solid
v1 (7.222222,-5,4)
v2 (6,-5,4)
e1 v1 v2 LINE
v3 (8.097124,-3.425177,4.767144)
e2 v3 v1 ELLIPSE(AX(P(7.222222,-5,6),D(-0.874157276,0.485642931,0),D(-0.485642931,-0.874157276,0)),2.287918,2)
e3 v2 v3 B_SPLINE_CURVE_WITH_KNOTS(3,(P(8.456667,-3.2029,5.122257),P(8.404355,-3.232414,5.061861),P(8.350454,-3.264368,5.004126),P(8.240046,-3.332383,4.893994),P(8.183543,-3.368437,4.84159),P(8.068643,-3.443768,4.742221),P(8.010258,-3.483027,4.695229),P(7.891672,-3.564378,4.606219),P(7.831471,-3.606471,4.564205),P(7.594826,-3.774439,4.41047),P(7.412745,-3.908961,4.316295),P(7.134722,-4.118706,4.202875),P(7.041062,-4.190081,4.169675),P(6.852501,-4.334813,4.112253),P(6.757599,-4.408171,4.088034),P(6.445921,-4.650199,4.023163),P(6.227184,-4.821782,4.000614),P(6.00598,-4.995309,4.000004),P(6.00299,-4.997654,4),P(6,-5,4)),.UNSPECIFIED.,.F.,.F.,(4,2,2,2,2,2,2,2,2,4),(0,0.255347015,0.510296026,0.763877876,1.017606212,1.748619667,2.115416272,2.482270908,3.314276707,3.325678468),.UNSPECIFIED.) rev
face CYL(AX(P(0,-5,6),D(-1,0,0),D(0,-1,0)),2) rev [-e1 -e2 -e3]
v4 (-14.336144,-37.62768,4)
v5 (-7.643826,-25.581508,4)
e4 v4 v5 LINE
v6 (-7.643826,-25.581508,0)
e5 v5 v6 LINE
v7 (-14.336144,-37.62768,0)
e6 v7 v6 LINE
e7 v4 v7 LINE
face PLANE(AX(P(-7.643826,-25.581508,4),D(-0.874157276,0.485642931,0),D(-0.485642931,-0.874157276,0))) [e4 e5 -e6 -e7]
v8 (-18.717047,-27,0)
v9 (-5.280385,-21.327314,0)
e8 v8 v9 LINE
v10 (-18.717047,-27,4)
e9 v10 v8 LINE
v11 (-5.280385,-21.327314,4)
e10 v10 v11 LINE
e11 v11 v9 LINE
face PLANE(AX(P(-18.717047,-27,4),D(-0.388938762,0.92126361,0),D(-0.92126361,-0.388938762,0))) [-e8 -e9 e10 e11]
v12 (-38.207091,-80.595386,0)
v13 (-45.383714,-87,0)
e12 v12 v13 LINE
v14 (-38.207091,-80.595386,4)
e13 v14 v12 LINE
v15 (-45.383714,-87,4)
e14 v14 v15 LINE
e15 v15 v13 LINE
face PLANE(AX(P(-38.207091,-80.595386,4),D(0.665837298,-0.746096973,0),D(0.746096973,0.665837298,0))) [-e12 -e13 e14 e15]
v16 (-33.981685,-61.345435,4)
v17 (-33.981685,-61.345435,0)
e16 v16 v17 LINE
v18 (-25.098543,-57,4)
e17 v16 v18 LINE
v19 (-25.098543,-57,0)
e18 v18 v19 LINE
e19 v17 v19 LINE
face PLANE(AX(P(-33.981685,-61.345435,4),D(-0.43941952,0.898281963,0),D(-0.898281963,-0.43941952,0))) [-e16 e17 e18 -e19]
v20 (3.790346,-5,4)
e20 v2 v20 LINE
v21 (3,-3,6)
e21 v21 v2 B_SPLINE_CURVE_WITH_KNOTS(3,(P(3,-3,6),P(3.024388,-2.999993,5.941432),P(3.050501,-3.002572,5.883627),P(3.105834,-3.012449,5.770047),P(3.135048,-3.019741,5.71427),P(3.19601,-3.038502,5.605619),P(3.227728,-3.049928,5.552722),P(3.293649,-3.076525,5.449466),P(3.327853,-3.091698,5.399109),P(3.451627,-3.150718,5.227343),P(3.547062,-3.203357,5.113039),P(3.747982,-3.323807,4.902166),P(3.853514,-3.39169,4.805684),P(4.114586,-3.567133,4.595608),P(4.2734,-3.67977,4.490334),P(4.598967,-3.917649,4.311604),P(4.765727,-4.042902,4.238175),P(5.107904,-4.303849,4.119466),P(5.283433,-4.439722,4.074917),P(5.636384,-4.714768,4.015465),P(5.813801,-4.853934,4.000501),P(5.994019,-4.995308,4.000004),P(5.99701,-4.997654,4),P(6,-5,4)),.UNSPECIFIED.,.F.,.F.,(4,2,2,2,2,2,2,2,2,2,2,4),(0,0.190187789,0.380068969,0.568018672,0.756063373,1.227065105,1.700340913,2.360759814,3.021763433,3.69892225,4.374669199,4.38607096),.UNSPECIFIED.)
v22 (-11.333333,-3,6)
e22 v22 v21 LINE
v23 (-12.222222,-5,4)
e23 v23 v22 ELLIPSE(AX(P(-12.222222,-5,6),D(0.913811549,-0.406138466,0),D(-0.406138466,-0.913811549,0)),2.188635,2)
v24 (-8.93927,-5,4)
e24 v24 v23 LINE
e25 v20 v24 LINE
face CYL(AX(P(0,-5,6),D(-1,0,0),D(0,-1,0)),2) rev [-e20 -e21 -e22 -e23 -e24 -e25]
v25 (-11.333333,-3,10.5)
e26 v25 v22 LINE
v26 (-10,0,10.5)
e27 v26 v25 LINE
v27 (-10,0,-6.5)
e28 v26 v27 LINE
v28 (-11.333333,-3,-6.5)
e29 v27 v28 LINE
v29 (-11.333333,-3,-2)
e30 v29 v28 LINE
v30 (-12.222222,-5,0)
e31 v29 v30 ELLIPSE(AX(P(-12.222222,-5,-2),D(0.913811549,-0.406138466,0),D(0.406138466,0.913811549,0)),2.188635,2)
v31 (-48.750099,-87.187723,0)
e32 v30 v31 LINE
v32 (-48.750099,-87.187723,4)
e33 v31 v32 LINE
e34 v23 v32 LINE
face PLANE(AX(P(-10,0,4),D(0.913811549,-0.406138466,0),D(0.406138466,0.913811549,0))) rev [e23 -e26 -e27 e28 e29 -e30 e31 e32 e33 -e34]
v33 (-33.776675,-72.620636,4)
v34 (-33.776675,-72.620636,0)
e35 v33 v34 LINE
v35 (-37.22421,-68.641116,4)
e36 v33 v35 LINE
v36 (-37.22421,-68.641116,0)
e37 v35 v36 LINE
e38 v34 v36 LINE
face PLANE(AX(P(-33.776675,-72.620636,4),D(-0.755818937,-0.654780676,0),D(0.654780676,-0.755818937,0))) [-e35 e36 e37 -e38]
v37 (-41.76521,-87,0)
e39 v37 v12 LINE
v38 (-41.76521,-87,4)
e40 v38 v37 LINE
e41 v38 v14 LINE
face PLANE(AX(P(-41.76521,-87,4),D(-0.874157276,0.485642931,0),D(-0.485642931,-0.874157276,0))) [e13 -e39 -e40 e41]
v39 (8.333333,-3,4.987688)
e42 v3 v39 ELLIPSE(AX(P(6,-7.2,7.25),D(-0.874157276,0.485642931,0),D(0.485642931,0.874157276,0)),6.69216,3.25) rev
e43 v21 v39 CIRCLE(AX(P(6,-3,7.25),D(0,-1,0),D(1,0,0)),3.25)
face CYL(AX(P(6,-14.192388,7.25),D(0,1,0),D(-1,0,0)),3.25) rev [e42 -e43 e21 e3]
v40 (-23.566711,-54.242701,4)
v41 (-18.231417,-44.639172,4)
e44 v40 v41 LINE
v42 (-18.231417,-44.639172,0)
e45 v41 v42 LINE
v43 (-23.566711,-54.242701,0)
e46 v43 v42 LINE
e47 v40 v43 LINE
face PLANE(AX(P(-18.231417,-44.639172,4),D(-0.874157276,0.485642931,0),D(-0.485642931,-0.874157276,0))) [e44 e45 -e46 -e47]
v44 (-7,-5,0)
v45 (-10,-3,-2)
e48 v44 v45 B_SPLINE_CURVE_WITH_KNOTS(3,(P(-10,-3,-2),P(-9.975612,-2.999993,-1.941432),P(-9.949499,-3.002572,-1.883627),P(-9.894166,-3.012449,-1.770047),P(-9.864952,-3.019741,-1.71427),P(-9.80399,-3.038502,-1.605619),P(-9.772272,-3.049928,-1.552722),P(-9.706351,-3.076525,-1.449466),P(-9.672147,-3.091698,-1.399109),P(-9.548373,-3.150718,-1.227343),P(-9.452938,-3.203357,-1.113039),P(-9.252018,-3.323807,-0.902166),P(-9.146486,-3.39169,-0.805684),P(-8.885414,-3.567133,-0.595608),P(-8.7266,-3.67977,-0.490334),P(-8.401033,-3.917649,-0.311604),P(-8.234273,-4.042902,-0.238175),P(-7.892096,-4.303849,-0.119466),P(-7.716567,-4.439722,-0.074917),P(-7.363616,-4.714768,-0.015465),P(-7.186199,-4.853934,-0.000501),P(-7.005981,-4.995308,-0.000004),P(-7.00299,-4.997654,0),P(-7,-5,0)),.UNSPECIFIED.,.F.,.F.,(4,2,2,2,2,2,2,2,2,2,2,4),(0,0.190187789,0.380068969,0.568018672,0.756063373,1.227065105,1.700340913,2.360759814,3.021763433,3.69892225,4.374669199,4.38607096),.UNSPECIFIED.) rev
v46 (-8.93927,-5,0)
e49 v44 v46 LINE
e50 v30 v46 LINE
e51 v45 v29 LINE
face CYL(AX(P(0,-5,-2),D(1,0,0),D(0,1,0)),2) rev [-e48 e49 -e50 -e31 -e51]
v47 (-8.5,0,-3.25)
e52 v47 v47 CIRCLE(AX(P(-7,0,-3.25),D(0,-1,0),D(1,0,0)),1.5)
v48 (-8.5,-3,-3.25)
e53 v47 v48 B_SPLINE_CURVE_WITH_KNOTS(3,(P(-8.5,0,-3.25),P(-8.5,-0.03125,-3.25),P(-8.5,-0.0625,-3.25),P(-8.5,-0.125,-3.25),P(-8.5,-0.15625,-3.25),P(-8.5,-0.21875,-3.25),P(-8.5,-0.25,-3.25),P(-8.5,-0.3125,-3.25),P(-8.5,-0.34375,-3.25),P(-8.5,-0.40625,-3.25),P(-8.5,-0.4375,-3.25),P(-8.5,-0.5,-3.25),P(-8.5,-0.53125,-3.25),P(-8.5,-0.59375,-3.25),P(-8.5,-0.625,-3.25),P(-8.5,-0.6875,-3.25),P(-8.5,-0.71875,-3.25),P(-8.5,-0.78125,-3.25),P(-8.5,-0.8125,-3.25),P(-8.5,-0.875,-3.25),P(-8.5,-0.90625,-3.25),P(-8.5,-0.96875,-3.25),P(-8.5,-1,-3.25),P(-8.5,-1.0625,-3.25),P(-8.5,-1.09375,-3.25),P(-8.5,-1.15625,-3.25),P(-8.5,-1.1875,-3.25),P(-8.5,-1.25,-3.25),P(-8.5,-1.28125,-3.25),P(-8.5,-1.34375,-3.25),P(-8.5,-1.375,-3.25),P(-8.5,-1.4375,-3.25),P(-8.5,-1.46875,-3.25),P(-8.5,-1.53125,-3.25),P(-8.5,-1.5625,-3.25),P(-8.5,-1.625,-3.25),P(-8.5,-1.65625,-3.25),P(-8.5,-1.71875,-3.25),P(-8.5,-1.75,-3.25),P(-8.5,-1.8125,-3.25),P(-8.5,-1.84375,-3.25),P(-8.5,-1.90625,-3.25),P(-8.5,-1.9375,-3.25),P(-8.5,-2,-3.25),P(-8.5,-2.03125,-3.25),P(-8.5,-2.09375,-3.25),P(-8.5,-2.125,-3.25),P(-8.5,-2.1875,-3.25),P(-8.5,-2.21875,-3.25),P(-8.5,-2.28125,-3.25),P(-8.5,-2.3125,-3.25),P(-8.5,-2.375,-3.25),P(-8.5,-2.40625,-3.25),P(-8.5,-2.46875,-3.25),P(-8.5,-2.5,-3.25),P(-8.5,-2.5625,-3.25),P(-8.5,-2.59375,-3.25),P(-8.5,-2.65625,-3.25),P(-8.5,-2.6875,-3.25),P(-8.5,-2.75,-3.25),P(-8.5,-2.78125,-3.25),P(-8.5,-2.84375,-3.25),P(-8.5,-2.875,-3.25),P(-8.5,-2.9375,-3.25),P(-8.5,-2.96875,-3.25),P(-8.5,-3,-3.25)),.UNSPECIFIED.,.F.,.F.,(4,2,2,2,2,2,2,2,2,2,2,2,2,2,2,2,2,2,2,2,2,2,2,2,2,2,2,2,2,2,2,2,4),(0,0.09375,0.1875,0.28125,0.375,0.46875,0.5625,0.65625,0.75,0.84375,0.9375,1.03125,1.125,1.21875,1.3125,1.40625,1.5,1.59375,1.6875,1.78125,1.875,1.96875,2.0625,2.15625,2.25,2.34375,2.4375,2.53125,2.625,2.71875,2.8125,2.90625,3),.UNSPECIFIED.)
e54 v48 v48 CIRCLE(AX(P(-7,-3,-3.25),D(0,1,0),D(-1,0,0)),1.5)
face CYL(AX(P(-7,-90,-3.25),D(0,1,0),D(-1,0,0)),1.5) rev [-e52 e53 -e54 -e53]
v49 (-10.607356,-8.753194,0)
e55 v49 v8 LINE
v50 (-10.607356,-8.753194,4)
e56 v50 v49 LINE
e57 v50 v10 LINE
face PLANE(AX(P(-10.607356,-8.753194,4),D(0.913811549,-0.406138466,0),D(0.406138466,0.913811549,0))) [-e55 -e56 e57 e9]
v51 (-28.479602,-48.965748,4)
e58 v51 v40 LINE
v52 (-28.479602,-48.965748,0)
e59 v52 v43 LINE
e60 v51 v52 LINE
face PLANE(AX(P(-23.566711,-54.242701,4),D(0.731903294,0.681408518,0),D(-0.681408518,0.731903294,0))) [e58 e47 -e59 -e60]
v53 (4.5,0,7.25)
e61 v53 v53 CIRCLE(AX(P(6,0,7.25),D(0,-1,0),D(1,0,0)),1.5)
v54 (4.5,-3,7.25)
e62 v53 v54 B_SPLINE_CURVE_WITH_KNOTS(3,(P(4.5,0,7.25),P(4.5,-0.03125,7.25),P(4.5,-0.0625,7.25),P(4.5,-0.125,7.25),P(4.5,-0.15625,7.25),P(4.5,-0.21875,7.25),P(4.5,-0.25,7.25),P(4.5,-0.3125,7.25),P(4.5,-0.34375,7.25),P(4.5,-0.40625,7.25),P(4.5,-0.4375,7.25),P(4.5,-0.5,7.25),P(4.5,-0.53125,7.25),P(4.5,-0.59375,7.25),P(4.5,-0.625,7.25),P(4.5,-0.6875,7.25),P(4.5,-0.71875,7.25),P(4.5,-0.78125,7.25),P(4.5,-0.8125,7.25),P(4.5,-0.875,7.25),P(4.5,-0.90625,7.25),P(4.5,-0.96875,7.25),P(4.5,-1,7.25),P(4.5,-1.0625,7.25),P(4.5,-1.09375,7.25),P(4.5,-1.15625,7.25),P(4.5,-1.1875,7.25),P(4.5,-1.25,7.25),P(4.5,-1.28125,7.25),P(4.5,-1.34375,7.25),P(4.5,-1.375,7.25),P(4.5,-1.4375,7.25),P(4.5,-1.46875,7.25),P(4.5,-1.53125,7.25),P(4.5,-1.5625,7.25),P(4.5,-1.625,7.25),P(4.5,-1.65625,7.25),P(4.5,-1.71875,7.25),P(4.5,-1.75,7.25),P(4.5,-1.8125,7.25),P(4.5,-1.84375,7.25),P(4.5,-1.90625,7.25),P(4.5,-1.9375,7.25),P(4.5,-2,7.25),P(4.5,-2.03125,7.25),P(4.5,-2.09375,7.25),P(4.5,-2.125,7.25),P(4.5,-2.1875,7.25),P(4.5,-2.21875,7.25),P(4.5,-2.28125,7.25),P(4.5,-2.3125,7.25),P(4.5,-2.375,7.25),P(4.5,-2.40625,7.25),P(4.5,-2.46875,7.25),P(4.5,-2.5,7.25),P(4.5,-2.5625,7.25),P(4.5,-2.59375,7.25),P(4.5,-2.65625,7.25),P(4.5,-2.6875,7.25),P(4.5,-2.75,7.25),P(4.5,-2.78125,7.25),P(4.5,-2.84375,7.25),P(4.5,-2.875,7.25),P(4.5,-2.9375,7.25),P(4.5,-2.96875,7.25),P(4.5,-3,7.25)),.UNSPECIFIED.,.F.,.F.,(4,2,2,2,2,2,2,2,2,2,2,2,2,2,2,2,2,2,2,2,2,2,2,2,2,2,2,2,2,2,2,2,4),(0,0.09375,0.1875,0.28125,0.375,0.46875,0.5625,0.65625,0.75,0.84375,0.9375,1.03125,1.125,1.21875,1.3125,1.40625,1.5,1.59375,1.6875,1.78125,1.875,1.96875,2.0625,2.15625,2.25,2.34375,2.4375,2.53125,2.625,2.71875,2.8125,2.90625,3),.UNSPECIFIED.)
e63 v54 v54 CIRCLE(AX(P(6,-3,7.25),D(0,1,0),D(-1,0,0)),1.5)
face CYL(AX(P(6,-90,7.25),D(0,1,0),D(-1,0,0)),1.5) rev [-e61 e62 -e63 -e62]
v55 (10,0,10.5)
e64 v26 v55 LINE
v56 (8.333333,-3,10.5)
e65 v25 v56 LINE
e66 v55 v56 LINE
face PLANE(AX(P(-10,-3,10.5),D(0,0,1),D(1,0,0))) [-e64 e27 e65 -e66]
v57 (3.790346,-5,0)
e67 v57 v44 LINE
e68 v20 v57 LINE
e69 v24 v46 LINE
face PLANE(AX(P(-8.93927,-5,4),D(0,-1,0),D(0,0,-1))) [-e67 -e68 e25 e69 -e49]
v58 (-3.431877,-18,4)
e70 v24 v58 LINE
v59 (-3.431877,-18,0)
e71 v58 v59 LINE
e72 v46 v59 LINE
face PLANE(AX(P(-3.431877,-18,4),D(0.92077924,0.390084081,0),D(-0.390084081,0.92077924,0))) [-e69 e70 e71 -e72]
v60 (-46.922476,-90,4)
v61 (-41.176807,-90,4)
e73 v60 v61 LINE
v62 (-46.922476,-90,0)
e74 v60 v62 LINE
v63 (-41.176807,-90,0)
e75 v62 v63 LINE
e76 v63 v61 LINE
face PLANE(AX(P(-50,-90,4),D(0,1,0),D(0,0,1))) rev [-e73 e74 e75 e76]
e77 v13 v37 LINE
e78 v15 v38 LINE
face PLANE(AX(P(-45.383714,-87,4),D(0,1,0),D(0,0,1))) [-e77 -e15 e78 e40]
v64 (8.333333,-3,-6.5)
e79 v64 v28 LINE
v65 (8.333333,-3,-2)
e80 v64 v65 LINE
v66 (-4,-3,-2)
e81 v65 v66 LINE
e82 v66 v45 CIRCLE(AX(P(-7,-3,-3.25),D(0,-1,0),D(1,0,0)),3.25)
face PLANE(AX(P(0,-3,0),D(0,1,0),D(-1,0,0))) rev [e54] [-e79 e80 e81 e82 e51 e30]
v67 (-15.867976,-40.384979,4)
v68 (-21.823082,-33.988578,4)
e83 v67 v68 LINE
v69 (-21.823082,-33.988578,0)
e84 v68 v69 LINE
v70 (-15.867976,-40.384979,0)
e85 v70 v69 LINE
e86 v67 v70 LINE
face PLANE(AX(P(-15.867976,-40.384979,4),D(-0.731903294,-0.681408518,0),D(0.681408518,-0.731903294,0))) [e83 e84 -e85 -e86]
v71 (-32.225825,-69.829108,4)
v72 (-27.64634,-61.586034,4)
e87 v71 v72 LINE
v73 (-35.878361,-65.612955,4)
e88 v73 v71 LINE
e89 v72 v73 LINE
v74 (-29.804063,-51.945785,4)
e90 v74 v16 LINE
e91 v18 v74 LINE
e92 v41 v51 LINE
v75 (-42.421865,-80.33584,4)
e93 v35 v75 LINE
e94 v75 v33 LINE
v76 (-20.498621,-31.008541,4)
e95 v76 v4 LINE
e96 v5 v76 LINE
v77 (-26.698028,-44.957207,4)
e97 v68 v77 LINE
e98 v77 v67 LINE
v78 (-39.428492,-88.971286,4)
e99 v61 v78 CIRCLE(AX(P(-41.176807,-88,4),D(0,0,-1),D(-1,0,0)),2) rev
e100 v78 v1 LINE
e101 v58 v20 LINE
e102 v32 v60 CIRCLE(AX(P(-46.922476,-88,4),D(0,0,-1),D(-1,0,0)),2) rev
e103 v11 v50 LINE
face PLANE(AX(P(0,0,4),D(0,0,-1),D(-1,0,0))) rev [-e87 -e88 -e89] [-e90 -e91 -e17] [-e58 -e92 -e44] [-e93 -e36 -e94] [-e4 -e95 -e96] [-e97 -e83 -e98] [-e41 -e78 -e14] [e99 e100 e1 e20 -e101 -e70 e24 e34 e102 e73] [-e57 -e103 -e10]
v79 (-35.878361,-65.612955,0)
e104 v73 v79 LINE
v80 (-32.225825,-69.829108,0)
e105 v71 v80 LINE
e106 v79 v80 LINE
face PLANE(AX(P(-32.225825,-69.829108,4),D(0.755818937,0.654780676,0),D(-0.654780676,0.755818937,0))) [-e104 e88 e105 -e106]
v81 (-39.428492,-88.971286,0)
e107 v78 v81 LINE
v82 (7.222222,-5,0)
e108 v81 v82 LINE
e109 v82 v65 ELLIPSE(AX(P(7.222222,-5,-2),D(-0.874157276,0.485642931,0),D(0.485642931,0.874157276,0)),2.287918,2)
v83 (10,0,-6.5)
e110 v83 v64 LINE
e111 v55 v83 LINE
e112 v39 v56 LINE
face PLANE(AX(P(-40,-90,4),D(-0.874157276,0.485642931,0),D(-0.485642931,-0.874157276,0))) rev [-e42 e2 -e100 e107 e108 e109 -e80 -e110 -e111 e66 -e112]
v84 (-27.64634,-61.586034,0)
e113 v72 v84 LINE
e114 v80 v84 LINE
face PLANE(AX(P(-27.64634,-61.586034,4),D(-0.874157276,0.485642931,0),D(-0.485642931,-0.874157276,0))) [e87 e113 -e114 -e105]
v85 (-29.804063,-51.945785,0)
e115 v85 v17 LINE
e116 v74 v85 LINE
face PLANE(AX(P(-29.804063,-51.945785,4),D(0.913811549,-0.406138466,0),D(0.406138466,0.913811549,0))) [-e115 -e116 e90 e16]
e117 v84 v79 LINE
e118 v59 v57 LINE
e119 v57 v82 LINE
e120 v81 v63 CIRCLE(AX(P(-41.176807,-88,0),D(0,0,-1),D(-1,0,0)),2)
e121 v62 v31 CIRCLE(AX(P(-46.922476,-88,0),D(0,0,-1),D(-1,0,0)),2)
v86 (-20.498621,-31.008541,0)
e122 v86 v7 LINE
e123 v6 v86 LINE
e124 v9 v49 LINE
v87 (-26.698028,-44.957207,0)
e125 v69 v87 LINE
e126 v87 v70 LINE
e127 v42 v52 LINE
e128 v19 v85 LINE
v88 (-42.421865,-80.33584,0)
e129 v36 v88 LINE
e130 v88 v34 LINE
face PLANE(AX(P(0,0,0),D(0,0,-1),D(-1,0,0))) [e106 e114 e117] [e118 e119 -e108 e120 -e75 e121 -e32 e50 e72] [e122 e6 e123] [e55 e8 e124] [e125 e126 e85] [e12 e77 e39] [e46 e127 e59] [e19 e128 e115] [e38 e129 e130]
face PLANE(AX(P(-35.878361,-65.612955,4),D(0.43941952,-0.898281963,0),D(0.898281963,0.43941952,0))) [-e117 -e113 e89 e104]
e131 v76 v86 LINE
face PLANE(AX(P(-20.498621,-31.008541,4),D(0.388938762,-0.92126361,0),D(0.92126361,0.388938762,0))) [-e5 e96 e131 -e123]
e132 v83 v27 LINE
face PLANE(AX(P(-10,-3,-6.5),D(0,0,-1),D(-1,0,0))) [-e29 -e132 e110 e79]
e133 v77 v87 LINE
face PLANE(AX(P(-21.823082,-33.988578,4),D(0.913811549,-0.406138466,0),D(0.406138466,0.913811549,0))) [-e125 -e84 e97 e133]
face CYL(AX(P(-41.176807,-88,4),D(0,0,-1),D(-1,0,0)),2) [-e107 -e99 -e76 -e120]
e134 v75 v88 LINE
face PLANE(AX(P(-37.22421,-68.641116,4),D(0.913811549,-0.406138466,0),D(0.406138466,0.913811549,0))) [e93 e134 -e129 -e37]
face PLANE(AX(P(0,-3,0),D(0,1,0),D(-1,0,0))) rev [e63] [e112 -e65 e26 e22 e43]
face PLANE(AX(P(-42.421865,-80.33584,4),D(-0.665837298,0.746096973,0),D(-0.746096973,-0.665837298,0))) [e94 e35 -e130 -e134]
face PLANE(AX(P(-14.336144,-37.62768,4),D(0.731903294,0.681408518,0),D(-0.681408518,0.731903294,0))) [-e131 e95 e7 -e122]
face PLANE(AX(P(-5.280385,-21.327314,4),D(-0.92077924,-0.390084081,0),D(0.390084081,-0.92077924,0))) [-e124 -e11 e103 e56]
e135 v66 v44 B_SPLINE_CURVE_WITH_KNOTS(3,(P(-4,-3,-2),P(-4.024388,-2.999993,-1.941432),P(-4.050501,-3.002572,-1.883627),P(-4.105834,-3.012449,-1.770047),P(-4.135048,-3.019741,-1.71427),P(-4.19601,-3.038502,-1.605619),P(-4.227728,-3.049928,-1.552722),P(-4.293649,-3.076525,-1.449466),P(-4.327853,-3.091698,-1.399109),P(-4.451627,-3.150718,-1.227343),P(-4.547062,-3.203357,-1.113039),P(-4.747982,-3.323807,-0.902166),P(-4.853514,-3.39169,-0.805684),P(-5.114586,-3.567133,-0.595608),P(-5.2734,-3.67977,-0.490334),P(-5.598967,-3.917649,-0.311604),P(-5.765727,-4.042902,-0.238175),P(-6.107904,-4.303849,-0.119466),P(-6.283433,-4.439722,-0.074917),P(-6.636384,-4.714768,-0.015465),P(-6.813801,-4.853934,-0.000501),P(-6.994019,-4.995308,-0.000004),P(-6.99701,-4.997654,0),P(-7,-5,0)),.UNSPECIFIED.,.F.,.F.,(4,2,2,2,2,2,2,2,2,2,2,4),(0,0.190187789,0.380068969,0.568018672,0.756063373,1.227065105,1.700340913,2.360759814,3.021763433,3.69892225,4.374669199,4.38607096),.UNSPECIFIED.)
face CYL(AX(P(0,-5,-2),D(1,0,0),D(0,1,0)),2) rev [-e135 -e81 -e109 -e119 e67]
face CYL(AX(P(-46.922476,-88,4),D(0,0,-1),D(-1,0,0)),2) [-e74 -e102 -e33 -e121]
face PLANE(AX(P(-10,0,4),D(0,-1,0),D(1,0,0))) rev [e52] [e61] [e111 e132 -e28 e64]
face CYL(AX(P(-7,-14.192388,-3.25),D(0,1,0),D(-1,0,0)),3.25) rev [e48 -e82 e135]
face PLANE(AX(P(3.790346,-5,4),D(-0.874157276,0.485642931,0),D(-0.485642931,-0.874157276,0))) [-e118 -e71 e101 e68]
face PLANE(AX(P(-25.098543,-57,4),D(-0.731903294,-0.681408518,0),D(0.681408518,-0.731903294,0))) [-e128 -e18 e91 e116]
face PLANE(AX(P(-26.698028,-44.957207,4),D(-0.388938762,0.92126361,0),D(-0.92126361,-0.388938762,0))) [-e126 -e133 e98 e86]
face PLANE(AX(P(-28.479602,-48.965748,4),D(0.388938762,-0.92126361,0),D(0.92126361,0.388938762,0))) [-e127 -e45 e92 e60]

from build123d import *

# Parameters (mm, degrees)
BOSS_EXTRUDE1_DEPTH             = 4
SKETCH2_W                       = 20
SKETCH2_H                       = 17
BOSS_EXTRUDE2_DEPTH             = 3
CUT_EXTRUDE1_DEPTH              = 104.490337713
CUT_EXTRUDE1_DEPTH_BACK         = 104.490337713
BOSS_EXTRUDE3_REACH             = 105.49
BOSS_EXTRUDE3_DIRECTION_2_REACH = 105.49
FILLET2_START                   = -12.222222222
FILLET2_DEPTH                   = 20.555555555
FILLET2_START_2                 = -6.5
FILLET2_2_DEPTH                 = 17
CUT_EXTRUDE2_DEPTH              = 104.490337713
CUT_EXTRUDE2_DEPTH_BACK         = 104.490337713
SKETCH4_R                       = 1.5
FILLET1_R                       = 2
SKETCH8_R                       = 3.25
CUT_EXTRUDE5_DEPTH              = 2


with BuildPart() as part:
    # Sketch1 → Boss-Extrude1 (new body)
    with BuildSketch(Plane.XY):
        Polygon((-10, 0), (10, 0), (-40, -90), (-50, -90), align=None)
        Polygon((-8.939269622, -5), (3.790345509, -5), (-3.431876714, -18), align=None, mode=Mode.SUBTRACT)
        Polygon((-10.607355622, -8.753193502), (-18.717047399, -27), (-5.280384607, -21.327314208), align=None, mode=Mode.SUBTRACT)
        Polygon((-7.643825511, -25.581507835), (-14.336143532, -37.627680274), (-20.498621264, -31.008541196), align=None, mode=Mode.SUBTRACT)
        Polygon((-21.823082205, -33.988578312), (-26.698028096, -44.957206566), (-15.867976064, -40.384978831), align=None, mode=Mode.SUBTRACT)
        Polygon((-18.231416968, -44.639172459), (-23.566710848, -54.242701442), (-28.47960196, -48.965747762), align=None, mode=Mode.SUBTRACT)
        Polygon((-29.804062901, -51.945784878), (-33.981685193, -61.345435036), (-25.09854338, -57), align=None, mode=Mode.SUBTRACT)
        Polygon((-45.383714066, -87), (-41.765210047, -87), (-38.207091023, -80.595385758), align=None, mode=Mode.SUBTRACT)
        Polygon((-27.646340017, -61.586033947), (-32.225825485, -69.829107788), (-35.878360761, -65.612955064), align=None, mode=Mode.SUBTRACT)
        Polygon((-37.22421022, -68.641116347), (-42.421865314, -80.335840308), (-33.776674606, -72.620636206), align=None, mode=Mode.SUBTRACT)
    extrude(amount=BOSS_EXTRUDE1_DEPTH)

    # Sketch2 → Boss-Extrude2 (add)
    with BuildSketch(Plane(origin=(0, 0, 0), x_dir=(1, 0, 0), z_dir=(0, 1, 0))):
        with Locations((0, -2)):
            Rectangle(SKETCH2_W, SKETCH2_H)
    extrude(amount=-BOSS_EXTRUDE2_DEPTH)

    # Sketch3 → Cut-Extrude1 (cut, two sides: drawn at the far end of the back side and taken through both)
    with BuildSketch(Plane.XY.offset(4).offset(-CUT_EXTRUDE1_DEPTH_BACK)):
        Polygon((8.333333333, -3), (10, 0), (10, -3), align=None)
    extrude(amount=CUT_EXTRUDE1_DEPTH + CUT_EXTRUDE1_DEPTH_BACK, mode=Mode.SUBTRACT)

    # Boss-Extrude3: up to this face of the body (flat: up to its plane)
    boss_extrude3_end = Plane(part.part.faces().sort_by_distance((-0.410628019, -1.47826087, 10.5))[0])
    # Sketch7 → Boss-Extrude3 (add, up to the picked face)
    with BuildSketch(Plane.XY.offset(4), mode=Mode.PRIVATE) as boss_extrude3_sk1:
        Polygon((-10, -3), (-11.333333333, -3), (-10, 0), align=None)
    boss_extrude3_tool1 = split(extrude(boss_extrude3_sk1.sketch, amount=BOSS_EXTRUDE3_REACH, mode=Mode.PRIVATE), bisect_by=boss_extrude3_end, keep=Keep.BOTH, mode=Mode.PRIVATE)
    add(boss_extrude3_tool1.solids().sort_by(Axis((-10.444444, -2, 4), (0, 0, 1)))[0])

    # Boss-Extrude3 direction 2: up to this face of the body (flat: up to its plane)
    boss_extrude3_direction_2_end = Plane(part.part.faces().sort_by_distance((-0.410628019, -1.47826087, -6.5))[0])
    # Sketch7 → Boss-Extrude3 direction 2 (add, up to the picked face)
    with BuildSketch(Plane.XY.offset(4), mode=Mode.PRIVATE) as boss_extrude3_direction_2_sk1:
        Polygon((-10, -3), (-11.333333333, -3), (-10, 0), align=None)
    boss_extrude3_direction_2_tool1 = split(extrude(boss_extrude3_direction_2_sk1.sketch, amount=-BOSS_EXTRUDE3_DIRECTION_2_REACH, mode=Mode.PRIVATE), bisect_by=boss_extrude3_direction_2_end, keep=Keep.BOTH, mode=Mode.PRIVATE)
    add(boss_extrude3_direction_2_tool1.solids().sort_by(Axis((-10.444444, -2, 4), (0, 0, -1)))[0])

    # Fillet2: read off the stored shape, not the designer's step
    # Fillet2 outline → Fillet2 (add)
    with BuildSketch(Plane.YZ.offset(FILLET2_START)):
        with BuildLine():
            Line((-3, 4), (-3, 6))
            ThreePointArc((-3, 6), (-3.585786438, 4.585786438), (-5, 4))
            Line((-5, 4), (-3, 4))
        make_face()
        with BuildLine():
            ThreePointArc((-5, 0), (-3.585786438, -0.585786438), (-3, -2))
            Line((-3, -2), (-3, 0))
            Line((-3, 0), (-5, 0))
        make_face()
    extrude(amount=FILLET2_DEPTH)

    # Fillet2 2 outline → Fillet2 2 (cut)
    with BuildSketch(Plane.XY.offset(FILLET2_START_2)):
        Polygon((10, -1), (9.444444444, -1), (8.333333333, -3), (6.666666667, -6), (10, -6), align=None)
        Polygon((-12.222222222, -5), (-11.333333333, -3), (-12.222222222, -3), align=None)
    extrude(amount=FILLET2_2_DEPTH, mode=Mode.SUBTRACT)

    # Sketch4 → Cut-Extrude2 (cut, two sides: drawn at the far end of the back side and taken through both)
    with BuildSketch(Plane(origin=(0, 0, 0), x_dir=(1, 0, 0), z_dir=(0, 1, 0)).offset(-CUT_EXTRUDE2_DEPTH_BACK)):
        with Locations(Location((-7, 3.25, 0), (0, 0, 236.442690238))):
            Circle(SKETCH4_R)
        with Locations(Location((6, -7.25, 0), (0, 0, 123.557309765))):
            Circle(SKETCH4_R)
    extrude(amount=CUT_EXTRUDE2_DEPTH + CUT_EXTRUDE2_DEPTH_BACK, mode=Mode.SUBTRACT)

    # Fillet1
    fillet1_edges = [part.edges().sort_by_distance(p)[0] for p in [
        (-40, -90, 2),
        (-50, -90, 2),
    ]]
    fillet(fillet1_edges, radius=FILLET1_R)

    # Sketch8 → Cut-Extrude5 (cut)
    with BuildSketch(Plane.XZ.offset(3)):
        with Locations((-7, -3.25)):
            Circle(SKETCH8_R)
        with Locations((6, 7.25)):
            Circle(SKETCH8_R)
    extrude(amount=CUT_EXTRUDE5_DEPTH, mode=Mode.SUBTRACT)


solid = part.part
